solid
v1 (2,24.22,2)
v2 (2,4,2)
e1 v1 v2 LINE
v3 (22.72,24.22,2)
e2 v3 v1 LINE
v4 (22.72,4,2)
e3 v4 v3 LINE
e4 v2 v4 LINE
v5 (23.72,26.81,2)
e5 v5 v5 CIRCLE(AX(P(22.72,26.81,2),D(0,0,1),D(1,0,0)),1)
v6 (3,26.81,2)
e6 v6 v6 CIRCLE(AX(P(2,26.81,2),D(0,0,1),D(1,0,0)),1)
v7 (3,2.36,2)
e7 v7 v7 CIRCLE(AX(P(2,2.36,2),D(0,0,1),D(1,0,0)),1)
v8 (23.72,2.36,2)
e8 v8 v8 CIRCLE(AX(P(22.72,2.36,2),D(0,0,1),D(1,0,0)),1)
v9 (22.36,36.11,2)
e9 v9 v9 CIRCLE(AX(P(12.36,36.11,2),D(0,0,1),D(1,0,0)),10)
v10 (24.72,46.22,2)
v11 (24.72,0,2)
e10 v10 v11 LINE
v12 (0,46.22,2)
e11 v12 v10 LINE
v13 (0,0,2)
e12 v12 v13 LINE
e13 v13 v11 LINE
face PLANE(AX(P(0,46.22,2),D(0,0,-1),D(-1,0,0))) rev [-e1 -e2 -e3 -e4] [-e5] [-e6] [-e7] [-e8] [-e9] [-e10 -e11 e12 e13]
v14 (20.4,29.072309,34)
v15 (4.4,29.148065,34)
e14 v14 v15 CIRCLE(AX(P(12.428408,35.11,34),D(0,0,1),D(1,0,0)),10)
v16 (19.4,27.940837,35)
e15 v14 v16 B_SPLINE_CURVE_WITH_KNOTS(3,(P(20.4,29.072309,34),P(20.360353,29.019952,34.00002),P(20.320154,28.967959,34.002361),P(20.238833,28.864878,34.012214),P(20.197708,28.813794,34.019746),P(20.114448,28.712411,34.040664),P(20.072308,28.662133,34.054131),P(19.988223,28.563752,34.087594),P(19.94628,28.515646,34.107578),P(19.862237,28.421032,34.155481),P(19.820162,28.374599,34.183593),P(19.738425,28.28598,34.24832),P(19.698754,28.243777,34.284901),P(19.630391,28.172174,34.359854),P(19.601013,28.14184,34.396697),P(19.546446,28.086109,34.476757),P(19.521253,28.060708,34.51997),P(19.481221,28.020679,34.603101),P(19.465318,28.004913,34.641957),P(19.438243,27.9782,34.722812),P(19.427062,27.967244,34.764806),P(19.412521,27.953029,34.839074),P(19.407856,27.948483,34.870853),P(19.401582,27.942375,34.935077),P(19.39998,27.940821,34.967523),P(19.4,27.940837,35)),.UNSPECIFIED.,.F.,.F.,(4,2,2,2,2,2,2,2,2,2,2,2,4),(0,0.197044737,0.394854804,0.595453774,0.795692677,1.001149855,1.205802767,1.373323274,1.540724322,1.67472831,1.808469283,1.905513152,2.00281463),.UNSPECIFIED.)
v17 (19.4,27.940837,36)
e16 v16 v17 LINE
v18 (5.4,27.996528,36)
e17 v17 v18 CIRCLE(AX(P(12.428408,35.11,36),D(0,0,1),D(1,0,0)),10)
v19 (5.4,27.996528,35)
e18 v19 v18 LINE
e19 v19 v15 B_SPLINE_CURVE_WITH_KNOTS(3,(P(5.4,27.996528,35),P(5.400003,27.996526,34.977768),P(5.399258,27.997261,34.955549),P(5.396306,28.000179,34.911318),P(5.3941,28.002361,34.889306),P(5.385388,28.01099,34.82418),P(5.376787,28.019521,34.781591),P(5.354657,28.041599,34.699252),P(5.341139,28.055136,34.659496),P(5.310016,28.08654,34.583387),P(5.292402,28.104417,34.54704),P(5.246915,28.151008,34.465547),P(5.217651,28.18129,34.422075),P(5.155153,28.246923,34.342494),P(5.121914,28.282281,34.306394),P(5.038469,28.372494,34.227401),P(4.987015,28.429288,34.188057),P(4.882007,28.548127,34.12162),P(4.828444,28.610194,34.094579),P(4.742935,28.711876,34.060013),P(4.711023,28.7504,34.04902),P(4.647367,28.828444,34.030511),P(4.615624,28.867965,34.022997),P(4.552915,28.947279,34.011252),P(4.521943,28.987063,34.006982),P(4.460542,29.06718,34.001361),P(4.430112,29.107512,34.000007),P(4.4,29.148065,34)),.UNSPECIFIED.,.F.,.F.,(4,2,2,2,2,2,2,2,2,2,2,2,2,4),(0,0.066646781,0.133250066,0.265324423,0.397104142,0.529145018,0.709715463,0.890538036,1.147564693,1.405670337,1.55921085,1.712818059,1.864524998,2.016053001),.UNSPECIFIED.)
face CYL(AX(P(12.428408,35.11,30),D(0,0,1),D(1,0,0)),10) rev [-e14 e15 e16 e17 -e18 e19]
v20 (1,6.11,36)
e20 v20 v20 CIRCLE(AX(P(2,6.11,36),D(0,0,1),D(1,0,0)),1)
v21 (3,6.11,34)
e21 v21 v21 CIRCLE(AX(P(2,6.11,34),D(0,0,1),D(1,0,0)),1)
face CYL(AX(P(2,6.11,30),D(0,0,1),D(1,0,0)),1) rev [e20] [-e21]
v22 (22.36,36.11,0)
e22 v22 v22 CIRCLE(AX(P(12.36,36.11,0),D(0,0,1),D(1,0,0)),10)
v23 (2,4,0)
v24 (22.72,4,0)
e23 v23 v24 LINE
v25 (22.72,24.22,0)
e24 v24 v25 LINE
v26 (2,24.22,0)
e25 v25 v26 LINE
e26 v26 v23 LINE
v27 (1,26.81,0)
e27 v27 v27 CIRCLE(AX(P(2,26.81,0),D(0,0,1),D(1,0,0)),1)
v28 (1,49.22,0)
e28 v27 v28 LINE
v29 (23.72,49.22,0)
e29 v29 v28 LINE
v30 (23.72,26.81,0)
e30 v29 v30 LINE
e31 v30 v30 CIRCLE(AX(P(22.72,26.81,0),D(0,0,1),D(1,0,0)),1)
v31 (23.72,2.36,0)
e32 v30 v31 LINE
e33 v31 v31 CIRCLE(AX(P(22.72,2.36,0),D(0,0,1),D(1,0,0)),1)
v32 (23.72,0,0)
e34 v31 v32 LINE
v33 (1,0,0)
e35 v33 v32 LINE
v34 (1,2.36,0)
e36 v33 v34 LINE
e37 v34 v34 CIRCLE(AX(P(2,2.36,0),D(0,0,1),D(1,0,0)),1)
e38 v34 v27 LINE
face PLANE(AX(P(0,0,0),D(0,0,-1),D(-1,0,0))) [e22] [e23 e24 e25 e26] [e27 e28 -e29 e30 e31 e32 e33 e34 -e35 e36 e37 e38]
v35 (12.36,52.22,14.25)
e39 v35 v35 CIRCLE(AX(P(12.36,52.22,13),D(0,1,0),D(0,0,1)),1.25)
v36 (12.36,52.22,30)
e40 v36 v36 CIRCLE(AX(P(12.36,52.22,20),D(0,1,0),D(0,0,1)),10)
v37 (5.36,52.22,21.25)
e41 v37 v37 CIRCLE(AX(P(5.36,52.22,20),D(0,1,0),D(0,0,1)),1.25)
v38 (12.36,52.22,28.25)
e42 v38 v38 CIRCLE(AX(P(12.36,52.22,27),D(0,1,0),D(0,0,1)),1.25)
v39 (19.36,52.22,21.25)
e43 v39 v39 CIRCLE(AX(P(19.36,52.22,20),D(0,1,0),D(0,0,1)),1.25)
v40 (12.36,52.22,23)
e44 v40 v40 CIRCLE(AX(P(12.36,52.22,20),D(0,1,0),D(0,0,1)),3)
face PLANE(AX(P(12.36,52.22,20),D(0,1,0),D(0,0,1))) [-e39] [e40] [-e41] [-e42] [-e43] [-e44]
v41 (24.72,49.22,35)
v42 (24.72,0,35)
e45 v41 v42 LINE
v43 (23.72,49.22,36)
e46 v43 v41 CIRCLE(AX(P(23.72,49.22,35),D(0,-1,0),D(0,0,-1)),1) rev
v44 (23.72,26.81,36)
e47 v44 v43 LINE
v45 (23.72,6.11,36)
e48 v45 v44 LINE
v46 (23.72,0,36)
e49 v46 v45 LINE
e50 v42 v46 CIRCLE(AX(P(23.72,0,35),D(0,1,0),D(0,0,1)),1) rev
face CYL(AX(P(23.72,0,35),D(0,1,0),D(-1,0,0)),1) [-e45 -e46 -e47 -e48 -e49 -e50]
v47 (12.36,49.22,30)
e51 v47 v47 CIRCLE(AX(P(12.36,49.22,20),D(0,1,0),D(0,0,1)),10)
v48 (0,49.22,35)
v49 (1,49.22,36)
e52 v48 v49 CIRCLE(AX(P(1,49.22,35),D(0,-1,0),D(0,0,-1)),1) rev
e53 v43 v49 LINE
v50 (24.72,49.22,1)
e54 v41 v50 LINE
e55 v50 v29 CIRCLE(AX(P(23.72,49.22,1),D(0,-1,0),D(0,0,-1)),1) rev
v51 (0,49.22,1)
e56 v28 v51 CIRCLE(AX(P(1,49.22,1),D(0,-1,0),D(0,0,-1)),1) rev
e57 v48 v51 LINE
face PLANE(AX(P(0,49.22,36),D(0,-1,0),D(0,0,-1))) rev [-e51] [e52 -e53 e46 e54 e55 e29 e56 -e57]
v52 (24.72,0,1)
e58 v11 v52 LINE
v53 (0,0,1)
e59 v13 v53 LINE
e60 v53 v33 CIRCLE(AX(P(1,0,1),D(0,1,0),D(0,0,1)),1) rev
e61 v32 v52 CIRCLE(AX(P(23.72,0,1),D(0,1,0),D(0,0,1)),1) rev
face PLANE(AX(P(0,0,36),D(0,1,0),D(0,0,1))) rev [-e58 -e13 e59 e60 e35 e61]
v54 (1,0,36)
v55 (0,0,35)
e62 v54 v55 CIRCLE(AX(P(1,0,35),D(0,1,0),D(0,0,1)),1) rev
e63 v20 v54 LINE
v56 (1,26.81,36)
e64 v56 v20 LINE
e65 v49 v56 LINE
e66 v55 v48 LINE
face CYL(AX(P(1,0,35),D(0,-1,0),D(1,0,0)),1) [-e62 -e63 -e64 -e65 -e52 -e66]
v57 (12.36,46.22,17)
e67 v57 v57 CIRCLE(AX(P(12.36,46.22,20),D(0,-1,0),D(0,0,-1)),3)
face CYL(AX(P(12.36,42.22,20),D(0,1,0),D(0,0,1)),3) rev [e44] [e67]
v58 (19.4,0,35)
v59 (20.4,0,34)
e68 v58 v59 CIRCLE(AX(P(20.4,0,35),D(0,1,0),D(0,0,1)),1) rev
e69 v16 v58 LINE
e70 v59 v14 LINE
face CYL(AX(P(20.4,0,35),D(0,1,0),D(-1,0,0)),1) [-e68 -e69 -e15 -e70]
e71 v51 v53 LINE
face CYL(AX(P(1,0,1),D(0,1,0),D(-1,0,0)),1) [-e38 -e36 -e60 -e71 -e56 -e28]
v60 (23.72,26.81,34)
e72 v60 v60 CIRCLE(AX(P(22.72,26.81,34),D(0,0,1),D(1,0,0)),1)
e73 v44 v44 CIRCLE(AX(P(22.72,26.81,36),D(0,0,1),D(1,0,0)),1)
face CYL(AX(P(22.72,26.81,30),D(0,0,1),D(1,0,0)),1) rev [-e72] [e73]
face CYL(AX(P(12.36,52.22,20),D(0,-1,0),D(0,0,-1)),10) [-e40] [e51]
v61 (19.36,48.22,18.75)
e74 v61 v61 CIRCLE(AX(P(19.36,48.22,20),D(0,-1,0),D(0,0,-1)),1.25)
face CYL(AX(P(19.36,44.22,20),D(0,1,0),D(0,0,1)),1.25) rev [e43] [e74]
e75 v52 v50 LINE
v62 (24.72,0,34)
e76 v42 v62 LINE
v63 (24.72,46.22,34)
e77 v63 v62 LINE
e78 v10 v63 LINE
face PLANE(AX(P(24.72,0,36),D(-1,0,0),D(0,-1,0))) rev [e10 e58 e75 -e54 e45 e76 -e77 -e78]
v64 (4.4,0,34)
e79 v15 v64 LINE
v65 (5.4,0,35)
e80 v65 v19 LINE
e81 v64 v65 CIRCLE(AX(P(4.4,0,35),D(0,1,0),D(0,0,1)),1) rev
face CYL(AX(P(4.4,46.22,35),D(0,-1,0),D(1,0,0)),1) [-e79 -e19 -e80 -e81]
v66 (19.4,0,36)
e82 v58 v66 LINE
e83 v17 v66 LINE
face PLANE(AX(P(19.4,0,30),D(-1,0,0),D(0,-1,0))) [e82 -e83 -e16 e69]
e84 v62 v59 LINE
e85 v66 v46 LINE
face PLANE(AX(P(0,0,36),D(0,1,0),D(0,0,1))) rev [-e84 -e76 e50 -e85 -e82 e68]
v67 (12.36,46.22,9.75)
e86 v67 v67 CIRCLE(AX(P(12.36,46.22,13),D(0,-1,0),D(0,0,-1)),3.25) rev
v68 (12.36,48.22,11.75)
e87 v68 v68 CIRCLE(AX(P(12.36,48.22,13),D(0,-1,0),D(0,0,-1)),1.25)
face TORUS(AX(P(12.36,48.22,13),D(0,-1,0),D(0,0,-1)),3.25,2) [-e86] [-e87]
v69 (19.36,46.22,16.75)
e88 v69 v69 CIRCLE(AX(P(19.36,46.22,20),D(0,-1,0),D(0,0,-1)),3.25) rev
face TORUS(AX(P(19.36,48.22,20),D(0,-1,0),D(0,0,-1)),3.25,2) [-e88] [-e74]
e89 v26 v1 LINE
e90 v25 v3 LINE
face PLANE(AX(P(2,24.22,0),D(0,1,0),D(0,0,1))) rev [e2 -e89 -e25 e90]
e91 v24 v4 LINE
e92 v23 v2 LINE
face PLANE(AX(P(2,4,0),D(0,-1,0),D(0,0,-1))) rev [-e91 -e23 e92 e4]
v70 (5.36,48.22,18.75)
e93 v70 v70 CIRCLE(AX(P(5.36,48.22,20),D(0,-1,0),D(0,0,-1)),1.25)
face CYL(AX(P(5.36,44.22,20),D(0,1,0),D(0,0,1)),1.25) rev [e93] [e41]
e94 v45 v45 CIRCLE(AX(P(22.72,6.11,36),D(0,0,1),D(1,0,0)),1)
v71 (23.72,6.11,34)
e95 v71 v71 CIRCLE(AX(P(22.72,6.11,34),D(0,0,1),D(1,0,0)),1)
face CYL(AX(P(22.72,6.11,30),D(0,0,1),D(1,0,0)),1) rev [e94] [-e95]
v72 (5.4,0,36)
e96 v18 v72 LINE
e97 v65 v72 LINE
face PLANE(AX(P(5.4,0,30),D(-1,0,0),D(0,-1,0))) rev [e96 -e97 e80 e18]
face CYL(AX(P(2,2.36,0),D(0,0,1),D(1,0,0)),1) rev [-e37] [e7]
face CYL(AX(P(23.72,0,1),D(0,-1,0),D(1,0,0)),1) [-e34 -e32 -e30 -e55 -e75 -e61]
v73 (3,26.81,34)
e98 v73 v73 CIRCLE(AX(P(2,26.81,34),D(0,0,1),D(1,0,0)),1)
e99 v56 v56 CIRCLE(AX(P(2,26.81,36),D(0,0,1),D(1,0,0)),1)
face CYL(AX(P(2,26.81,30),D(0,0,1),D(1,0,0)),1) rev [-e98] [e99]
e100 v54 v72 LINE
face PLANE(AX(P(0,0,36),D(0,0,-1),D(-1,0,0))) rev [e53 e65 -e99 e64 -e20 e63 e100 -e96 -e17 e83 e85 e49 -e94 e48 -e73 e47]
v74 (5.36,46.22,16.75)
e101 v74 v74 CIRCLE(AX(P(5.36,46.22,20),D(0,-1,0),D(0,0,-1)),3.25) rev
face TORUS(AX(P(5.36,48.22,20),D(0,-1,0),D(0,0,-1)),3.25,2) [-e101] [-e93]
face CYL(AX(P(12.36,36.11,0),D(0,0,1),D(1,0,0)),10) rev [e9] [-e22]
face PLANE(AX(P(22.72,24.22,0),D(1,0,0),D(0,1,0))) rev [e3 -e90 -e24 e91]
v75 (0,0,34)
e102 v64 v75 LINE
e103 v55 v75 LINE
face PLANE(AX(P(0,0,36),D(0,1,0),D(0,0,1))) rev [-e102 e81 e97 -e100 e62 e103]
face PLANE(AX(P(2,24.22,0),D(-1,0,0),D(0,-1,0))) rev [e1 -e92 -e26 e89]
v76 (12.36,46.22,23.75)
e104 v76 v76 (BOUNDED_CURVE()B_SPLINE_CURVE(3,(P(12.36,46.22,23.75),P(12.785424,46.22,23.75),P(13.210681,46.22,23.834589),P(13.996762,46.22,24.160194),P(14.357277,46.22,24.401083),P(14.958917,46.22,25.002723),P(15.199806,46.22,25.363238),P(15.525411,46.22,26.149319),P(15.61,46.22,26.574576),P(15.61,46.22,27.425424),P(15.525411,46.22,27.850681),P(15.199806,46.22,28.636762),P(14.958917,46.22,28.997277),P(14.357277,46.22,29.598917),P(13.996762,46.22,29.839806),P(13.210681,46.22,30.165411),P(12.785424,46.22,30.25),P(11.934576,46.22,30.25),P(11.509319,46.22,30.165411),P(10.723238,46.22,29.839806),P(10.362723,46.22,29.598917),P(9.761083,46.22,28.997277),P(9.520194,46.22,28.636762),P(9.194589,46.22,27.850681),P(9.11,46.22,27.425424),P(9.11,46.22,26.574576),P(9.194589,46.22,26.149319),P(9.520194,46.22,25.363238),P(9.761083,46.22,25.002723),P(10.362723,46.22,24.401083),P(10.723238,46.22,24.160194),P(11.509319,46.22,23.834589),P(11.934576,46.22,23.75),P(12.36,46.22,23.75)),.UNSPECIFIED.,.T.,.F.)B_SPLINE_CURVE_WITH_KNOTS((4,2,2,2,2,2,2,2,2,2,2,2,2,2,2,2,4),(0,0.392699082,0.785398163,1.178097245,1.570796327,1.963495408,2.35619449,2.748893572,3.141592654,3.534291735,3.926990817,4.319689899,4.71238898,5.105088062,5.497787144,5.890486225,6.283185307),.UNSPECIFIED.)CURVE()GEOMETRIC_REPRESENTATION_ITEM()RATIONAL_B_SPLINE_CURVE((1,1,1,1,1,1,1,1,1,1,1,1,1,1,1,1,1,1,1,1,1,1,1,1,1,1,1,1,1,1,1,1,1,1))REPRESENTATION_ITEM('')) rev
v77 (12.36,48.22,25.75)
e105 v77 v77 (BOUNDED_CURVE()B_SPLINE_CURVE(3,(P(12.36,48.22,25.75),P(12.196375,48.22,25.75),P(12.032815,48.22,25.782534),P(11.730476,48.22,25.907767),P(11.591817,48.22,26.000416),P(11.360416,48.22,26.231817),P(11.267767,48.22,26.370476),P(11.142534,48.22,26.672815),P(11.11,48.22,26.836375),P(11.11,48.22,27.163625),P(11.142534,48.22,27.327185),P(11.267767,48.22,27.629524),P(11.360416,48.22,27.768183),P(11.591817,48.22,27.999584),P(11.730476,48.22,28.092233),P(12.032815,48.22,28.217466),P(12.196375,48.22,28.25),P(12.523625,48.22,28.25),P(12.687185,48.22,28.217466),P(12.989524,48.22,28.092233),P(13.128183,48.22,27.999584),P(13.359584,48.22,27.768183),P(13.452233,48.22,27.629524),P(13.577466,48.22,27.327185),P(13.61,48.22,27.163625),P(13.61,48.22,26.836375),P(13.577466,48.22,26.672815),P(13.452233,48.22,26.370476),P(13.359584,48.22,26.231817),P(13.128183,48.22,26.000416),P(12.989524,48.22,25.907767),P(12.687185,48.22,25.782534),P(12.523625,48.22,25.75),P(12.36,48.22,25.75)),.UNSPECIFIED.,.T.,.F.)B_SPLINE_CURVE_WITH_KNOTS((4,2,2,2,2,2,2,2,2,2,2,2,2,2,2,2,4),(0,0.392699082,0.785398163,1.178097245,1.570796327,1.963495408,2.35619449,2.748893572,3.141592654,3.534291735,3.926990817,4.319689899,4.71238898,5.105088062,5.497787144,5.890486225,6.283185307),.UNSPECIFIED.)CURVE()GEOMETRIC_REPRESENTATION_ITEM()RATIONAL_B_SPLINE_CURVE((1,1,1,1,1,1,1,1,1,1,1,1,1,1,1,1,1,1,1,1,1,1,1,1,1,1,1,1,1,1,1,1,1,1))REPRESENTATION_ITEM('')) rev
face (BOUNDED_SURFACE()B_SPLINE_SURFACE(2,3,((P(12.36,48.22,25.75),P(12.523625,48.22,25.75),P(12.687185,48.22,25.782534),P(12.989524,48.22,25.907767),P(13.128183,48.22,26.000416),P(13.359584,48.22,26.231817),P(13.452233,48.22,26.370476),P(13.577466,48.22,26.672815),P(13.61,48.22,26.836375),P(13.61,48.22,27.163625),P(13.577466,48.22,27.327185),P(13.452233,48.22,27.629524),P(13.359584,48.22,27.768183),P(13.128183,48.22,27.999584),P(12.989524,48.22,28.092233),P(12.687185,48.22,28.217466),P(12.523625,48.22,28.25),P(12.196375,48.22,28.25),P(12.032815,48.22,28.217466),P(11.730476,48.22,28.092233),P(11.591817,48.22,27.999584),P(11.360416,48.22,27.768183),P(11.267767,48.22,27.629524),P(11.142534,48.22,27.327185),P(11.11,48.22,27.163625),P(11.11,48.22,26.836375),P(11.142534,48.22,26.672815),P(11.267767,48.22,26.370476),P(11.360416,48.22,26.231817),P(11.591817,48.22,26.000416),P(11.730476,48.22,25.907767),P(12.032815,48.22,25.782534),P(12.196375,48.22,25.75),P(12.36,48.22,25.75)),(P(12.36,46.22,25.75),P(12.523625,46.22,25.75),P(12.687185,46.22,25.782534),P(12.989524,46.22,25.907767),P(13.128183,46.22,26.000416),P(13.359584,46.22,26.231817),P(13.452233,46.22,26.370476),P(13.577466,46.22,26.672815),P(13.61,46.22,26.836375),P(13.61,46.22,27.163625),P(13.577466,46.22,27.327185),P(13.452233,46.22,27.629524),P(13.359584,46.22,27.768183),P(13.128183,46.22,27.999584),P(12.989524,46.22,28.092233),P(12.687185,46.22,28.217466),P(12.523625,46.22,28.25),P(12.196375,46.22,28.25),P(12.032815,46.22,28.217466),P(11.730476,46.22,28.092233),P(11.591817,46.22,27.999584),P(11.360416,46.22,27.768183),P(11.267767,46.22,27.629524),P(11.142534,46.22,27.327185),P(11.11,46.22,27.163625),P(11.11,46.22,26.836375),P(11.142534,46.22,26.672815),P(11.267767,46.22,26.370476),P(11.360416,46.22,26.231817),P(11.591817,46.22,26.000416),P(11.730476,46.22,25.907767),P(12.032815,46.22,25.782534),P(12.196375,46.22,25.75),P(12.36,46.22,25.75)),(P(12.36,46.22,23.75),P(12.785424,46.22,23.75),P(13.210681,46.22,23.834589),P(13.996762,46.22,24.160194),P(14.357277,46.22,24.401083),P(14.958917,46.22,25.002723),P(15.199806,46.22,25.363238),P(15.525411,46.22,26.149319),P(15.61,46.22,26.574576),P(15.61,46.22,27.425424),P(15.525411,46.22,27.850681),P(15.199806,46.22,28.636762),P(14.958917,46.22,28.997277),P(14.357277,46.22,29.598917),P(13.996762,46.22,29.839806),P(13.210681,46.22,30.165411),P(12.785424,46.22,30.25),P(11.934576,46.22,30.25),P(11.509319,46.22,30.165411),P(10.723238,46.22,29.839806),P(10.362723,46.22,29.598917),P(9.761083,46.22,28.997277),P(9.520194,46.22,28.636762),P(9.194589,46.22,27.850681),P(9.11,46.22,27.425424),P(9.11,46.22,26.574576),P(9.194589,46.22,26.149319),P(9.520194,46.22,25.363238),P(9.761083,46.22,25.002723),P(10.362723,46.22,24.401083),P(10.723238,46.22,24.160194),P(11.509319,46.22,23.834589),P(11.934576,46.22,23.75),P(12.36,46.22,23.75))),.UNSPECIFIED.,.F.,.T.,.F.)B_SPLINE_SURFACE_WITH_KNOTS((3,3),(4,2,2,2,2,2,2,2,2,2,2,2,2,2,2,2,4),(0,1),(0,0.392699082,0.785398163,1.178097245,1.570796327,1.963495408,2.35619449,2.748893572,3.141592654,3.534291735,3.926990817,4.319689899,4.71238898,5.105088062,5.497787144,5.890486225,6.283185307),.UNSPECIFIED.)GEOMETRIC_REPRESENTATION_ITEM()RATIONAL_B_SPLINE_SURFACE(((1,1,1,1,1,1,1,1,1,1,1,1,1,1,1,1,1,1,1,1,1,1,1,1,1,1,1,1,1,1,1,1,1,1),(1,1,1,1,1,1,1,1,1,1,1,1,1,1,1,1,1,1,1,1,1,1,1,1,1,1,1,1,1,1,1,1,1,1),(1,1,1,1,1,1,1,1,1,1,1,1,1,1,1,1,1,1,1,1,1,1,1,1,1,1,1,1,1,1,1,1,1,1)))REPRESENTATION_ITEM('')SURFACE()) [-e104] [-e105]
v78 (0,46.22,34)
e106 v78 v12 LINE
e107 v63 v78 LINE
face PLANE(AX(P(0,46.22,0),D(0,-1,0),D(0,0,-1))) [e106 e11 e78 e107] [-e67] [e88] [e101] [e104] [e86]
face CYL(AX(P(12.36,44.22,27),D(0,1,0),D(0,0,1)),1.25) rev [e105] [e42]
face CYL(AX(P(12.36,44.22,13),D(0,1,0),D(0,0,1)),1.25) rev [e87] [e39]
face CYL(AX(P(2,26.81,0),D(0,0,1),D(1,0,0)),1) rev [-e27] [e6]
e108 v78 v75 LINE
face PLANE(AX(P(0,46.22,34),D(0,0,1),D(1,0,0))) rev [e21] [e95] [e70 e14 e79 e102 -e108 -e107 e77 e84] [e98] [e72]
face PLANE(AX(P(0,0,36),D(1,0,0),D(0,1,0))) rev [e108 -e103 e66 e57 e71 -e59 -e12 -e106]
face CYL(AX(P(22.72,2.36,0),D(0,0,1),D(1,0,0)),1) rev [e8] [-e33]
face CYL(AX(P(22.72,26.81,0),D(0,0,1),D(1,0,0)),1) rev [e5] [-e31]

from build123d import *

# Parameters (mm, degrees)
SKETCH_1_W          = 24.72
SKETCH_1_H          = 49.22
EXTRUDE_1_DEPTH     = 36
SKETCH_3_W          = 24.72
SKETCH_3_H          = 32
CUT_EXTRUDE_1_DEPTH = 46.22
SKETCH_4_R          = 1
SKETCH_4_R_2        = 10
SKETCH_4_W          = 20.72
SKETCH_4_H          = 20.22
CUT_EXTRUDE_2_DEPTH = 2
SKETCH_6_R          = 1
CUT_EXTRUDE_3_DEPTH = 6
SKETCH_7_R          = 10
EXTRUDE_2_DEPTH     = 3
SKETCH_8_R          = 1.25
CUT_EXTRUDE_4_DEPTH = 8
FILLET_1_R          = 2
FILLET_2_R          = 2
FILLET_3_SIZE       = 2
FILLET_4_R          = 2
FILLET_5_R          = 1
FILLET_6_R          = 1
FILLET_7_R          = 1
FILLET_8_R          = 1
FILLET_9_R          = 1
FILLET_10_R         = 1
SKETCH_9_R          = 3
CUT_EXTRUDE_5_DEPTH = 10


# Some blends are built 0.0001 mm under size
with BuildPart() as part:
    # 草图1 → 凸台-拉伸1 (new body)
    with BuildSketch(Plane.XY):
        with Locations((12.36, 24.61)):
            Rectangle(SKETCH_1_W, SKETCH_1_H)
    extrude(amount=EXTRUDE_1_DEPTH)

    # 草图3 → 切除-拉伸1 (cut)
    with BuildSketch(Plane.XZ):
        with Locations((12.36, 18)):
            Rectangle(SKETCH_3_W, SKETCH_3_H)
    extrude(amount=-CUT_EXTRUDE_1_DEPTH, mode=Mode.SUBTRACT)

    # 草图4 → 切除-拉伸2 (cut)
    with BuildSketch(Plane.XY.offset(2)):
        with Locations((2, 2.36)):
            Circle(SKETCH_4_R)
        with Locations((22.72, 2.36)):
            Circle(SKETCH_4_R)
        with Locations((22.72, 26.81)):
            Circle(SKETCH_4_R)
        with Locations((2, 26.81)):
            Circle(SKETCH_4_R)
        with Locations((12.36, 36.11)):
            Circle(SKETCH_4_R_2)
        with Locations((12.36, 14.11)):
            Rectangle(SKETCH_4_W, SKETCH_4_H)
    extrude(amount=-CUT_EXTRUDE_2_DEPTH, mode=Mode.SUBTRACT)

    # 草图6 → 切除-拉伸3 (cut)
    with BuildSketch(Plane.XY.offset(36)):
        with BuildLine():
            Line((5.4, 27.996527822), (5.4, 28))
            Line((5.4, 28), (19.4, 28))
            Line((19.4, 28), (19.4, 27.940836898))
            ThreePointArc((19.4, 27.940836898), (21.640245754, 31.218722824), (22.428407613, 35.11))
            ThreePointArc((22.428407613, 35.11), (8.573804918, 44.337244337), (5.4, 27.996527822))
        make_face()
        with BuildLine():
            Line((19.4, 28), (5.4, 28))
            Line((5.4, 28), (5.4, 27.996527822))
            ThreePointArc((5.4, 27.996527822), (12.388628696, 25.110079118), (19.4, 27.940836898))
            Line((19.4, 27.940836898), (19.4, 28))
        make_face()
        with BuildLine():
            ThreePointArc((19.4, 27.940836898), (12.388628696, 25.110079118), (5.4, 27.996527822))
            Line((5.4, 27.996527822), (5.4, 0))
            Line((5.4, 0), (19.4, 0))
            Line((19.4, 0), (19.4, 27.940836898))
        make_face()
        with Locations((2, 26.81)):
            Circle(SKETCH_6_R)
        with Locations((22.72, 6.11)):
            Circle(SKETCH_6_R)
        with Locations((2, 6.11)):
            Circle(SKETCH_6_R)
        with Locations((22.72, 26.81)):
            Circle(SKETCH_6_R)
    extrude(amount=-CUT_EXTRUDE_3_DEPTH, mode=Mode.SUBTRACT)

    # 草图7 → 凸台-拉伸2 (add)
    with BuildSketch(Plane(origin=(0, 49.22, 0), x_dir=(1, 0, 0), z_dir=(0, 1, 0))):
        with Locations(Location((12.36, -20, 0), (0, 0, 270))):
            Circle(SKETCH_7_R)
    extrude(amount=EXTRUDE_2_DEPTH)

    # 草图8 → 切除-拉伸4 (cut)
    with BuildSketch(Plane(origin=(0, 52.22, 0), x_dir=(1, 0, 0), z_dir=(0, 1, 0))):
        with Locations(Location((12.36, -13, 0), (0, 0, 270))):
            Circle(SKETCH_8_R)
        with Locations(Location((12.36, -27, 0), (0, 0, 270))):
            Circle(SKETCH_8_R)
        with Locations(Location((19.36, -20, 0), (0, 0, 270))):
            Circle(SKETCH_8_R)
        with Locations(Location((5.36, -20, 0), (0, 0, 270))):
            Circle(SKETCH_8_R)
    extrude(amount=-CUT_EXTRUDE_4_DEPTH, mode=Mode.SUBTRACT)

    # 圆角1
    fillet_1_edges = [part.edges().sort_by_distance(p)[0] for p in [
        (12.36, 46.22, 11.75),
    ]]
    fillet(fillet_1_edges, radius=FILLET_1_R)

    # 圆角2
    fillet_2_edges = [part.edges().sort_by_distance(p)[0] for p in [
        (19.36, 46.22, 18.75),
    ]]
    fillet(fillet_2_edges, radius=FILLET_2_R)

    # 圆角3
    # a fillet whose section is not a circle: 2 mm, written as the material it takes off along each edge
    with BuildSketch(Plane(origin=(12.36, 46.22, 27), x_dir=(0, 0, 1), z_dir=(-1, 0, 0))) as fillet_3_piece_1:
        with BuildLine():
            Bezier((1.25 + FILLET_3_SIZE, 0), (1.25, 0), (1.25, FILLET_3_SIZE), weights=[1, 1, 1])
            Line((1.25, FILLET_3_SIZE), (1.25, 0))
            Line((1.25, 0), (1.25 + FILLET_3_SIZE, 0))
        make_face()
    revolve(axis=Axis((12.36, 46.22, 27), (0, 1, 0)), mode=Mode.SUBTRACT)

    # 圆角4
    fillet_4_edges = [part.edges().sort_by_distance(p)[0] for p in [
        (5.36, 46.22, 18.75),
    ]]
    fillet(fillet_4_edges, radius=FILLET_4_R)

    # 圆角5
    fillet_5_edges = [part.edges().sort_by_distance(p)[0] for p in [
        (0, 24.61, 36),
    ]]
    fillet(fillet_5_edges, radius=FILLET_5_R - 0.0001)  # a hair under: the kernel refuses the full size

    # 圆角6
    fillet_6_edges = [part.edges().sort_by_distance(p)[0] for p in [
        (24.72, 24.61, 36),
    ]]
    fillet(fillet_6_edges, radius=FILLET_6_R - 0.0001)  # a hair under: the kernel refuses the full size

    # 圆角7
    fillet_7_edges = [part.edges().sort_by_distance(p)[0] for p in [
        (0, 24.61, 0),
    ]]
    fillet(fillet_7_edges, radius=FILLET_7_R - 0.0001)  # a hair under: the kernel refuses the full size

    # 圆角8
    fillet_8_edges = [part.edges().sort_by_distance(p)[0] for p in [
        (24.72, 24.61, 0),
    ]]
    fillet(fillet_8_edges, radius=FILLET_8_R - 0.0001)  # a hair under: the kernel refuses the full size

    # 圆角9
    fillet_9_edges = [part.edges().sort_by_distance(p)[0] for p in [
        (19.4, 13.970418449, 34),
    ]]
    fillet(fillet_9_edges, radius=FILLET_9_R)

    # 圆角10
    fillet_10_edges = [part.edges().sort_by_distance(p)[0] for p in [
        (5.4, 13.998263911, 34),
    ]]
    fillet(fillet_10_edges, radius=FILLET_10_R)

    # 草图9 → 切除-拉伸5 (cut)
    with BuildSketch(Plane(origin=(0, 52.22, 0), x_dir=(1, 0, 0), z_dir=(0, 1, 0))):
        with Locations(Location((12.36, -20, 0), (0, 0, 270))):
            Circle(SKETCH_9_R)
    extrude(amount=-CUT_EXTRUDE_5_DEPTH, mode=Mode.SUBTRACT)


solid = part.part
